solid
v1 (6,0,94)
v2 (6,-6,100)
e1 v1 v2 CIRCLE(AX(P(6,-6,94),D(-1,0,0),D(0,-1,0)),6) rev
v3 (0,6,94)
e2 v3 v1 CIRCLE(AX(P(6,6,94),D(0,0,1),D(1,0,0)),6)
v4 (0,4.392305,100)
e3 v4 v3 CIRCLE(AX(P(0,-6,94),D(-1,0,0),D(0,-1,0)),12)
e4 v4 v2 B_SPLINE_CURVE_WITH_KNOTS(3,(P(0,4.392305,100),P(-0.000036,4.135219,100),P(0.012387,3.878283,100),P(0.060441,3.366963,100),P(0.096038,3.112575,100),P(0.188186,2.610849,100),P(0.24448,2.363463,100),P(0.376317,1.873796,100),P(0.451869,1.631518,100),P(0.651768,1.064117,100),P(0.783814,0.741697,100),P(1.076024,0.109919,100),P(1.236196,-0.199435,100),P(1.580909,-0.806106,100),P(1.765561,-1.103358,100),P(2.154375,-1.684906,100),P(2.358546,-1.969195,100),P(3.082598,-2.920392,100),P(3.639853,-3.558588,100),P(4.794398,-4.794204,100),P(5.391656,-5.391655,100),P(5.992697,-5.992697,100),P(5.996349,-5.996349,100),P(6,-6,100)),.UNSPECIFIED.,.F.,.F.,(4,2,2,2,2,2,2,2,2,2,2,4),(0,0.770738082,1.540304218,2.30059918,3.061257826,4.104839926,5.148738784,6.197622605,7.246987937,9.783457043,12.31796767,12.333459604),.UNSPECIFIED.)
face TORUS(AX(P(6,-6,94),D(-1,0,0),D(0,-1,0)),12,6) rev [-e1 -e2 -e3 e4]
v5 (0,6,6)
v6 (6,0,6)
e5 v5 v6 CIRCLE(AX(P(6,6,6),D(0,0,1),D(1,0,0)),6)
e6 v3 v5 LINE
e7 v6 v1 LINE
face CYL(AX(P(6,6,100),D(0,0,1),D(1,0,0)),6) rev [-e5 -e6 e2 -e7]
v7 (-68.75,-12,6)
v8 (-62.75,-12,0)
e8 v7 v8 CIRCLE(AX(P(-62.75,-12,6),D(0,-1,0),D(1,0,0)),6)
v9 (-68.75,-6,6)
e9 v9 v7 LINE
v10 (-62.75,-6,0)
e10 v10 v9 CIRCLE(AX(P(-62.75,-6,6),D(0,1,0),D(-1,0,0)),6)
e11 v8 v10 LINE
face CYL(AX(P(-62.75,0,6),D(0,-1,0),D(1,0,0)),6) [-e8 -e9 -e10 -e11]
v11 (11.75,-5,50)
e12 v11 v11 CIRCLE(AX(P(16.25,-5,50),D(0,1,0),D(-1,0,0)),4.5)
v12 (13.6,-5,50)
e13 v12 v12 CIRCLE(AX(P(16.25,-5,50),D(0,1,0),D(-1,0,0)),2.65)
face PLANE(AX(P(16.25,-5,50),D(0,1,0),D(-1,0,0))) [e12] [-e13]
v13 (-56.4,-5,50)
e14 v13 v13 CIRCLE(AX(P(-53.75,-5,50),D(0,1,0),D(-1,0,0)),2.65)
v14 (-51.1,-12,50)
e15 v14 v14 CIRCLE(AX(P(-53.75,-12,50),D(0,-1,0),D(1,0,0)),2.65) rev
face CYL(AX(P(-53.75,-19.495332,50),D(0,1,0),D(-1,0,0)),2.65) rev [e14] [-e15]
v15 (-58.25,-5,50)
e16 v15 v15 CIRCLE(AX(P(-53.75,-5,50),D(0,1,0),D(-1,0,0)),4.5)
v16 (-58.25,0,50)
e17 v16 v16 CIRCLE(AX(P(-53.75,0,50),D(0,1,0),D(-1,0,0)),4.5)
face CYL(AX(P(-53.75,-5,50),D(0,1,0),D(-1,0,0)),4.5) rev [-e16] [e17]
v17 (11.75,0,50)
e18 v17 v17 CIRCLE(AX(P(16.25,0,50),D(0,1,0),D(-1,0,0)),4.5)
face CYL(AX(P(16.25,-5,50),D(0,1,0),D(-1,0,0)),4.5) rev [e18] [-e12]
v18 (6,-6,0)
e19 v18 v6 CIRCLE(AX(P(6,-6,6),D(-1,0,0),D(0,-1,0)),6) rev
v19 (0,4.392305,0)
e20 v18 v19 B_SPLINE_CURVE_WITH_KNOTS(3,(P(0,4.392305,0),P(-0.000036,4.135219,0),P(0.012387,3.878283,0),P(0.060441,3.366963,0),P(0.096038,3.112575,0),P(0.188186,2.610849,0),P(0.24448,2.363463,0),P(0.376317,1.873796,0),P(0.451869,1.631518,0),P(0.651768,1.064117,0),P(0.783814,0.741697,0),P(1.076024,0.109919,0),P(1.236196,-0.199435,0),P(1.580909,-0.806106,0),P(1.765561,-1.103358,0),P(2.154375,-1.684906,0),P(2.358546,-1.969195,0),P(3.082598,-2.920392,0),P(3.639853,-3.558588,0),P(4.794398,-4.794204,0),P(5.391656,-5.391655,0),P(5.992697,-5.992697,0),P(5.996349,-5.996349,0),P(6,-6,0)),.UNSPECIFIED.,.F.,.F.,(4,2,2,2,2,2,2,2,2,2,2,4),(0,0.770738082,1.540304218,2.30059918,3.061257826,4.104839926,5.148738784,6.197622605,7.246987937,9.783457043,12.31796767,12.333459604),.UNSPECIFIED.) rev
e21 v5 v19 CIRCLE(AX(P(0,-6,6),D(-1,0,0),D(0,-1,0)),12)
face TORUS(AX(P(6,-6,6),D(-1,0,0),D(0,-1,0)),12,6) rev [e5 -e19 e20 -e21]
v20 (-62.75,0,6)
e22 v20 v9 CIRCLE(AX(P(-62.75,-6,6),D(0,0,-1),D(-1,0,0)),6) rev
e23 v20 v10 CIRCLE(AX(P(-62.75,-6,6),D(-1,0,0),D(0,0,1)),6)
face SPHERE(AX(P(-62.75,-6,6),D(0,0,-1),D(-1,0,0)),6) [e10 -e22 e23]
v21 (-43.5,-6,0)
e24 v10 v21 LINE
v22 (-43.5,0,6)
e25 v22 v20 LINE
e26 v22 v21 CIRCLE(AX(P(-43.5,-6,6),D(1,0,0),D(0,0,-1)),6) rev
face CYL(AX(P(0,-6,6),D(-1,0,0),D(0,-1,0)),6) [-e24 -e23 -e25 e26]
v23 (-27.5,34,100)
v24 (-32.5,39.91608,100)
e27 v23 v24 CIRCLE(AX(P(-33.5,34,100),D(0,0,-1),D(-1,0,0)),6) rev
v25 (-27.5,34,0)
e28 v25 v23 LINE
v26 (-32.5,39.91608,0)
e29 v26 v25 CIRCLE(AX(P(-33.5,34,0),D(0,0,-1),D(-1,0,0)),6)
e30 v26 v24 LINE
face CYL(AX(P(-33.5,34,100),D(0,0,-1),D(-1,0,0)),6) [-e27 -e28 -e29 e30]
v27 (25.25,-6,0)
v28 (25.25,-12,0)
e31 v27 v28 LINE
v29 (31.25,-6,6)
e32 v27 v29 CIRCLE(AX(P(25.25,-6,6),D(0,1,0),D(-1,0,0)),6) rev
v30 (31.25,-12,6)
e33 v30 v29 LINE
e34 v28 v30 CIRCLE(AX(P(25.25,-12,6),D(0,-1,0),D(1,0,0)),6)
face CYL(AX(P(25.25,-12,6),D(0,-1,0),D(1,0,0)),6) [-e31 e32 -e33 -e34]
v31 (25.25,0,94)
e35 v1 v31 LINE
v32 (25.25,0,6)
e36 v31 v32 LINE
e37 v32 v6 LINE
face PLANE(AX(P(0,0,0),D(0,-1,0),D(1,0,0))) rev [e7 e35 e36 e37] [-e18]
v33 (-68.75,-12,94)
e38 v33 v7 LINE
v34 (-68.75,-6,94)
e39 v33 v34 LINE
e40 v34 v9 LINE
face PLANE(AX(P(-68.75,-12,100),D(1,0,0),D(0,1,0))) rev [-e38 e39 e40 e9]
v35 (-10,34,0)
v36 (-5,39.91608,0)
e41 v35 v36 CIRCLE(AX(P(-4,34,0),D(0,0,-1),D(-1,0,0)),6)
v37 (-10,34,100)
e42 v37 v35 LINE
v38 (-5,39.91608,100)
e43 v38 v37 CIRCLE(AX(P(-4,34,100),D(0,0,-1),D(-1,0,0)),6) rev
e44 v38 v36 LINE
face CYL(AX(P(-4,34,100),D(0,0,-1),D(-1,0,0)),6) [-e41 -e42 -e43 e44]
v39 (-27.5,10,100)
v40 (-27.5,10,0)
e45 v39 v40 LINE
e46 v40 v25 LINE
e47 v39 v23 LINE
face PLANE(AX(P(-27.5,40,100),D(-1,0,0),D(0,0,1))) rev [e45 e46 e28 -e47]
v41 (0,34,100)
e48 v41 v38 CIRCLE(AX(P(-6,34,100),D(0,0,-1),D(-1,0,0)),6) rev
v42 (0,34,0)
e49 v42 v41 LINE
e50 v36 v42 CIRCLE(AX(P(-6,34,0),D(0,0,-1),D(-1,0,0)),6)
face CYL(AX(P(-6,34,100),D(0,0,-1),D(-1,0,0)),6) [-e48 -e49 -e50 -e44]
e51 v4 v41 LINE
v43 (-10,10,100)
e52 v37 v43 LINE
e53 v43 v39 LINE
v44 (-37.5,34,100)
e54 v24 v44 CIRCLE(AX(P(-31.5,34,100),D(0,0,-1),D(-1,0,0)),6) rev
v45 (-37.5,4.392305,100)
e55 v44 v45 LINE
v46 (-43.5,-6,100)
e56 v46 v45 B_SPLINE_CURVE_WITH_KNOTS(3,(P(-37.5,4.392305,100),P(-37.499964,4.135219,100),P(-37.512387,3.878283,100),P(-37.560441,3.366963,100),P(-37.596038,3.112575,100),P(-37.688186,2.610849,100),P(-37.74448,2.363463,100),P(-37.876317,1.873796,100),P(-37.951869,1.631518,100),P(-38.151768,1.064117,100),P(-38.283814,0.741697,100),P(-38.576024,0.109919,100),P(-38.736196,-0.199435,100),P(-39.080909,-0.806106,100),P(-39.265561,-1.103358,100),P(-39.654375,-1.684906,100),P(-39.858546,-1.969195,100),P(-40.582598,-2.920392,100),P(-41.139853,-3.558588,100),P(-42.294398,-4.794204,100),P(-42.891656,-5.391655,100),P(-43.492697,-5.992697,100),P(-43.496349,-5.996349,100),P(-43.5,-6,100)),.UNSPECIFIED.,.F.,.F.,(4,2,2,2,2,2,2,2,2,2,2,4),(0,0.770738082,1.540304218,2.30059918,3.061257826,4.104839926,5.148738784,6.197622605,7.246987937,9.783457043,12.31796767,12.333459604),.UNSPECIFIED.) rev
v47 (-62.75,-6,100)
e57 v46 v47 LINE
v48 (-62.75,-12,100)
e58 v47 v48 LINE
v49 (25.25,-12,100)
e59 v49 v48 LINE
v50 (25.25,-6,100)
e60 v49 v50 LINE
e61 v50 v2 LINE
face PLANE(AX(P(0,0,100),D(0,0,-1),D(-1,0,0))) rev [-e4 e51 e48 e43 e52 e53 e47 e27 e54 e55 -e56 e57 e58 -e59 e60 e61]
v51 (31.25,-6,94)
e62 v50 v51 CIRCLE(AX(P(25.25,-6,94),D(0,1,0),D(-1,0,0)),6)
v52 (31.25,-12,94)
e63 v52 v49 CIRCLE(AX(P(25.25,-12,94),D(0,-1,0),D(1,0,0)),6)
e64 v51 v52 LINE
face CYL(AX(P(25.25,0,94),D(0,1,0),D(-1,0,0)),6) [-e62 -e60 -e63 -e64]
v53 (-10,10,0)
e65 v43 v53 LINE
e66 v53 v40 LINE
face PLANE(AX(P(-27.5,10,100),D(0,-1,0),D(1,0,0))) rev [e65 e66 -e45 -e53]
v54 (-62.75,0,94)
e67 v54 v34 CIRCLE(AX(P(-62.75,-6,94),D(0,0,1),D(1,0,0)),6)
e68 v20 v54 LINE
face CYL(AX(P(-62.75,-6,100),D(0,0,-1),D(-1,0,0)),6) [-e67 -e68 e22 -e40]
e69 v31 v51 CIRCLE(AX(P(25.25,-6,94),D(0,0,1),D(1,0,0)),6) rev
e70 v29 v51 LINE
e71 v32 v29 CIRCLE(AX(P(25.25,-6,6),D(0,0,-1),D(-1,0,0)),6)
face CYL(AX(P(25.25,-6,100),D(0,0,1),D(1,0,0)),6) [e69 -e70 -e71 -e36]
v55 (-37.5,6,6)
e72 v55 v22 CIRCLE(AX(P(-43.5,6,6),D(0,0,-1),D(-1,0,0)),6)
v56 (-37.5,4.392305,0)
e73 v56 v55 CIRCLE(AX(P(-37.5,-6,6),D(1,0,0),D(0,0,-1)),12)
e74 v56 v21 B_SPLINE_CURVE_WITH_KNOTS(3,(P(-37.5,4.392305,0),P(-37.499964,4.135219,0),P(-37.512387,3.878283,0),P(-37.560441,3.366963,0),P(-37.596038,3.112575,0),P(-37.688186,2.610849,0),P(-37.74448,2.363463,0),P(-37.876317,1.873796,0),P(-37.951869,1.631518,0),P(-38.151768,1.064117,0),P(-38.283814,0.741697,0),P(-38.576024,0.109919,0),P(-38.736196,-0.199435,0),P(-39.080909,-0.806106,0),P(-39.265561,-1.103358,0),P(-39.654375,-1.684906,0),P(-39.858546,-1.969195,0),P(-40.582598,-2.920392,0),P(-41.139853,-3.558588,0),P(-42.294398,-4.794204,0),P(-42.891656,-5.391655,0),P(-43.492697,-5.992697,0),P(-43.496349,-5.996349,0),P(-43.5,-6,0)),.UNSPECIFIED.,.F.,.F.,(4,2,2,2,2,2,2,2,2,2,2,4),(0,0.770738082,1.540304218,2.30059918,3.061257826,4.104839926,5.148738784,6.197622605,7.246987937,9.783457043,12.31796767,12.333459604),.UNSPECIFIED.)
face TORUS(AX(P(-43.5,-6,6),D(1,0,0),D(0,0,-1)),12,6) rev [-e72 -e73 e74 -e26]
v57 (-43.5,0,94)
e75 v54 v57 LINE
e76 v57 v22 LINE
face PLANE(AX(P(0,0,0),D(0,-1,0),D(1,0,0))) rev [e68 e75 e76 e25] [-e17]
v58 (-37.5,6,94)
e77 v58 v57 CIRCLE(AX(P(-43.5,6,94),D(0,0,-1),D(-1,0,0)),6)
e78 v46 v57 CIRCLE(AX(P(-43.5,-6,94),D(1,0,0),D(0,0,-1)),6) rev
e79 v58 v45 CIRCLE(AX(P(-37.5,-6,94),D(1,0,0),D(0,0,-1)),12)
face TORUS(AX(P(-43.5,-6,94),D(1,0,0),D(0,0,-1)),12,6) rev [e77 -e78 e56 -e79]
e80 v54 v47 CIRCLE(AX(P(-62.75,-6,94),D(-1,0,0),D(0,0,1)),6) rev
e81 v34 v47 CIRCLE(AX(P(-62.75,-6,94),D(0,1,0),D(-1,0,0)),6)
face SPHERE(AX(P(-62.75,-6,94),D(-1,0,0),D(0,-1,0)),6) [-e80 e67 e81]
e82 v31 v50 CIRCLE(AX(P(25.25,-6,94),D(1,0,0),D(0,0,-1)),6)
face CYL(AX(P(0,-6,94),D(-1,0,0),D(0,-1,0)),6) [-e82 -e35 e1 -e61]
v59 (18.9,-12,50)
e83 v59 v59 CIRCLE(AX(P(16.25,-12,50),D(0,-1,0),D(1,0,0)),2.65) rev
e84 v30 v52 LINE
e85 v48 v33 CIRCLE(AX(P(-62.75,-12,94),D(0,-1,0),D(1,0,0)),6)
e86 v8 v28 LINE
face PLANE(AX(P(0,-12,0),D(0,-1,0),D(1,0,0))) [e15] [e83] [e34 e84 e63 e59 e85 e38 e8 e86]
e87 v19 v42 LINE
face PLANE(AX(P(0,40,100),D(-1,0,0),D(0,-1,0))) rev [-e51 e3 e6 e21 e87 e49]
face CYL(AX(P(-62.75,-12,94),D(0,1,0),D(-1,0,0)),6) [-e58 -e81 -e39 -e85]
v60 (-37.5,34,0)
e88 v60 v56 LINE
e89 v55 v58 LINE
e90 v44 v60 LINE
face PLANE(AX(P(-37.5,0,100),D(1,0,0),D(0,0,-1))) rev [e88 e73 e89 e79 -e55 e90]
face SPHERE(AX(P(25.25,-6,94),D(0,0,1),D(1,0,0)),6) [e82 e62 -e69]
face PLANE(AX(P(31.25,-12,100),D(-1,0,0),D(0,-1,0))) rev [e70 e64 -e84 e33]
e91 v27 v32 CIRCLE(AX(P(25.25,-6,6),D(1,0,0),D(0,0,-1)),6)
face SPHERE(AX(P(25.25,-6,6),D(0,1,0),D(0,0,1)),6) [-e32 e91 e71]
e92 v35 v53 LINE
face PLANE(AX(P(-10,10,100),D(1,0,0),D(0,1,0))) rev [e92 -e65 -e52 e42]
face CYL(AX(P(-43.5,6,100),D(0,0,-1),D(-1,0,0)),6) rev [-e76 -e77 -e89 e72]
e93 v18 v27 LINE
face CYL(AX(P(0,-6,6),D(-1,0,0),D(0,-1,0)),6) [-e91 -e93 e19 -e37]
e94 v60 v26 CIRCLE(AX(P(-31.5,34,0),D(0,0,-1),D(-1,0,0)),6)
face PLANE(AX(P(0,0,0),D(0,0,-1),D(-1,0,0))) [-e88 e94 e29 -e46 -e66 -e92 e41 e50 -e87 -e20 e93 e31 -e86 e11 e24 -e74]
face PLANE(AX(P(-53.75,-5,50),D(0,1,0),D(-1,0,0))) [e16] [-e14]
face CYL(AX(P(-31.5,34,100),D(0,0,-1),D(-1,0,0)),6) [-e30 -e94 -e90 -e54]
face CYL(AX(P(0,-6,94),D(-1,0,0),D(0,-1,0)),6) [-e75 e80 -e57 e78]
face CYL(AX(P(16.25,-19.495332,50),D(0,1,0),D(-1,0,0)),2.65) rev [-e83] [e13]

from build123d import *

# Parameters (mm, degrees)
BOSS_EXTRUDE1_DEPTH = 100
SKETCH2_W           = 100
SKETCH2_H           = 100
BOSS_EXTRUDE2_DEPTH = 12
SKETCH3_R           = 4.5
CUT_EXTRUDE1_DEPTH  = 5
SKETCH4_R           = 2.65
CUT_EXTRUDE2_DEPTH  = 7
FILLET1_R           = 6
FILLET3_R           = 6
FILLET4_R           = 6


with BuildPart() as part:
    # Sketch1 → Boss-Extrude1 (new body)
    with BuildSketch(Plane.XY):
        Polygon((0, 0), (-37.5, 0), (-37.5, 40), (-27.5, 40), (-27.5, 10), (-10, 10), (-10, 40), (0, 40), align=None)
    extrude(amount=BOSS_EXTRUDE1_DEPTH)

    # Sketch2 → Boss-Extrude2 (add)
    with BuildSketch(Plane.XZ):
        with Locations((-18.75, 50)):
            Rectangle(SKETCH2_W, SKETCH2_H)
    extrude(amount=BOSS_EXTRUDE2_DEPTH)

    # Sketch3 → Cut-Extrude1 (cut)
    with BuildSketch(Plane(origin=(0, 0, 0), x_dir=(1, 0, 0), z_dir=(0, 1, 0))):
        with Locations(Location((16.25, -50, 0), (0, 0, 180))):
            Circle(SKETCH3_R)
        with Locations(Location((-53.75, -50, 0), (0, 0, 180))):
            Circle(SKETCH3_R)
    extrude(amount=-CUT_EXTRUDE1_DEPTH, mode=Mode.SUBTRACT)

    # Sketch4 → Cut-Extrude2 (cut)
    with BuildSketch(Plane(origin=(0, -5, 0), x_dir=(1, 0, 0), z_dir=(0, 1, 0))):
        with Locations(Location((16.25, -50, 0), (0, 0, 180))):
            Circle(SKETCH4_R)
        with Locations(Location((-53.75, -50, 0), (0, 0, 180))):
            Circle(SKETCH4_R)
    extrude(amount=-CUT_EXTRUDE2_DEPTH, mode=Mode.SUBTRACT)

    # Fillet1
    # the kernel refuses this fillet: 6 mm, written as the material it takes off along each edge
    with BuildSketch(Plane(origin=(25.25, -6, 6), x_dir=(0, 1, 0), z_dir=(1, 0, 0))) as fillet1_piece_1_section:
        Polygon((0, 0), (FILLET1_R, 0), (FILLET1_R, -FILLET1_R), (0, -FILLET1_R), align=None)
    fillet1_piece_1 = extrude(amount=FILLET1_R, mode=Mode.PRIVATE)
    fillet1_piece_1 = fillet1_piece_1 - Plane(origin=(25.25, -6, 6), x_dir=(0, -0.7071067811865475, 0.7071067811865475), z_dir=(1, 0, 0)) * Sphere(FILLET1_R, mode=Mode.PRIVATE)
    add(fillet1_piece_1, mode=Mode.SUBTRACT)
    with BuildSketch(Plane(origin=(25.25, -6, 94), x_dir=(1, 0, 0), z_dir=(0, 0, 1))) as fillet1_piece_2_section:
        Polygon((0, 0), (FILLET1_R, 0), (FILLET1_R, FILLET1_R), (0, FILLET1_R), align=None)
    fillet1_piece_2 = extrude(amount=FILLET1_R, mode=Mode.PRIVATE)
    fillet1_piece_2 = fillet1_piece_2 - Plane(origin=(25.25, -6, 94), x_dir=(-0.7071067811865474, -0.7071067811865477, 0), z_dir=(0, 0, 1)) * Sphere(FILLET1_R, mode=Mode.PRIVATE)
    add(fillet1_piece_2, mode=Mode.SUBTRACT)
    with BuildSketch(Plane(origin=(-62.75, -6, 94), x_dir=(-1, 0, 0), z_dir=(0, 0, 1))) as fillet1_piece_3_section:
        Polygon((0, 0), (FILLET1_R, 0), (FILLET1_R, -FILLET1_R), (0, -FILLET1_R), align=None)
    fillet1_piece_3 = extrude(amount=FILLET1_R, mode=Mode.PRIVATE)
    fillet1_piece_3 = fillet1_piece_3 - Plane(origin=(-62.75, -6, 94), x_dir=(0.7071067811865477, -0.7071067811865474, 0), z_dir=(0, 0, 1)) * Sphere(FILLET1_R, mode=Mode.PRIVATE)
    add(fillet1_piece_3, mode=Mode.SUBTRACT)
    with BuildSketch(Plane(origin=(-62.75, -6, 6), x_dir=(0, 1, 0), z_dir=(-1, 0, 0))) as fillet1_piece_4_section:
        Polygon((0, 0), (FILLET1_R, 0), (FILLET1_R, FILLET1_R), (0, FILLET1_R), align=None)
    fillet1_piece_4 = extrude(amount=FILLET1_R, mode=Mode.PRIVATE)
    fillet1_piece_4 = fillet1_piece_4 - Plane(origin=(-62.75, -6, 6), x_dir=(0, -0.7071067811865475, 0.7071067811865475), z_dir=(-1, 0, 0)) * Sphere(FILLET1_R, mode=Mode.PRIVATE)
    add(fillet1_piece_4, mode=Mode.SUBTRACT)
    with BuildSketch(Plane(origin=(31.25, -6, 0), x_dir=(0, 0, 1), z_dir=(0, -1, 0)), Plane(origin=(31.25, -6, 100), x_dir=(-1, 0, 0), z_dir=(0, -1, 0))) as fillet1_piece_5:
        with BuildLine():
            CenterArc((FILLET1_R, FILLET1_R), FILLET1_R, 180, 90)
            Line((0, FILLET1_R), (0, 0))
            Line((0, 0), (FILLET1_R, 0))
        make_face()
    extrude(amount=21, mode=Mode.SUBTRACT)
    with BuildSketch(Plane(origin=(25.25, 0, 0), x_dir=(0, 0, 1), z_dir=(-1, 0, 0)), Plane(origin=(-37.5, 0, 0), x_dir=(0, 0, 1), z_dir=(-1, 0, 0))) as fillet1_piece_6:
        with BuildLine():
            CenterArc((FILLET1_R, -FILLET1_R), FILLET1_R, 90, 90)
            Line((0, -FILLET1_R), (0, 0))
            Line((0, 0), (FILLET1_R, 0))
        make_face()
    extrude(amount=25.25, mode=Mode.SUBTRACT)
    with BuildSketch(Plane(origin=(31.25, 0, 94), x_dir=(0, -1, 0), z_dir=(0, 0, -1)), Plane(origin=(-68.75, 0, 6), x_dir=(0, -1, 0), z_dir=(0, 0, 1))) as fillet1_piece_7:
        with BuildLine():
            CenterArc((FILLET1_R, FILLET1_R), FILLET1_R, 180, 90)
            Line((0, FILLET1_R), (0, 0))
            Line((0, 0), (FILLET1_R, 0))
        make_face()
    extrude(amount=88, mode=Mode.SUBTRACT)
    with BuildSketch(Plane(origin=(0, 0, 100), x_dir=(0, -1, 0), z_dir=(1, 0, 0)), Plane(origin=(-62.75, 0, 100), x_dir=(0, -1, 0), z_dir=(1, 0, 0))) as fillet1_piece_8:
        with BuildLine():
            CenterArc((FILLET1_R, FILLET1_R), FILLET1_R, 180, 90)
            Line((0, FILLET1_R), (0, 0))
            Line((0, 0), (FILLET1_R, 0))
        make_face()
    extrude(amount=25.25, mode=Mode.SUBTRACT)
    with BuildSketch(Plane(origin=(-68.75, -6, 100), x_dir=(1, 0, 0), z_dir=(0, -1, 0)), Plane(origin=(-68.75, -6, 0), x_dir=(0, 0, 1), z_dir=(0, -1, 0))) as fillet1_piece_9:
        with BuildLine():
            CenterArc((FILLET1_R, -FILLET1_R), FILLET1_R, 90, 90)
            Line((0, -FILLET1_R), (0, 0))
            Line((0, 0), (FILLET1_R, 0))
        make_face()
    extrude(amount=21, mode=Mode.SUBTRACT)
    with BuildSketch(Plane(origin=(-10, 40, -15), x_dir=(1, 0, 0), z_dir=(0, 0, 1)), Plane(origin=(-27.5, 40, -15), x_dir=(0, -1, 0), z_dir=(0, 0, 1)), Plane(origin=(-37.5, 40, -15), x_dir=(1, 0, 0), z_dir=(0, 0, 1)), Plane(origin=(0, 40, -15), x_dir=(0, -1, 0), z_dir=(0, 0, 1))) as fillet1_piece_10:
        with BuildLine():
            CenterArc((FILLET1_R, -FILLET1_R), FILLET1_R, 90, 90)
            Line((0, -FILLET1_R), (0, 0))
            Line((0, 0), (FILLET1_R, 0))
        make_face()
    extrude(amount=130, mode=Mode.SUBTRACT)

    # Fillet3
    fillet3_edges = [part.edges().sort_by_distance(p)[0] for p in [
        (0, 0, 50),
        (0, -1.757359313, 1.757359313),
        (0, -1.757359313, 98.242640687),
    ]]
    fillet(fillet3_edges, radius=FILLET3_R)

    # Fillet4
    # the kernel refuses this fillet: 6 mm, written as the material it adds along each edge
    with BuildSketch(Plane(origin=(-37.5, 0, 6), x_dir=(0, 1, 0), z_dir=(0, 0, 1))) as fillet4_piece_1:
        with BuildLine():
            CenterArc((FILLET4_R, FILLET4_R), FILLET4_R, 180, 90)
            Line((0, FILLET4_R), (0, 0))
            Line((0, 0), (FILLET4_R, 0))
        make_face()
    extrude(amount=88)
    with BuildSketch(Plane(origin=(-37.5, -6, 94), x_dir=(0, 1, 0), z_dir=(0, 0, -1))) as fillet4_piece_2_section:
        with BuildLine():
            CenterArc((6 + FILLET4_R, -FILLET4_R), FILLET4_R, 90, 90)
            Line((6 + FILLET4_R, 0), (6, 0))
            Line((6, 0), (6, -FILLET4_R))
        make_face()
    fillet4_piece_2 = revolve(axis=Axis((-37.5, -6, 94), (1, 0, 0)), revolution_arc=233.296989237, mode=Mode.PRIVATE)
    fillet4_piece_2 = split(fillet4_piece_2, bisect_by=Plane(origin=(-39.369769667, -1.500366283, 100), z_dir=(0, 0, -1)), keep=Keep.TOP, mode=Mode.PRIVATE)
    fillet4_piece_2 = split(fillet4_piece_2, bisect_by=Plane(origin=(-39.369769667, -12, 98.499633777), z_dir=(0, 1, 0)), keep=Keep.TOP, mode=Mode.PRIVATE)
    add(fillet4_piece_2)
    with BuildSketch(Plane(origin=(-37.5, -6, 6), x_dir=(0, 1, 0), z_dir=(0, 0, 1))) as fillet4_piece_3_section:
        with BuildLine():
            CenterArc((6 + FILLET4_R, FILLET4_R), FILLET4_R, 180, 90)
            Line((6, FILLET4_R), (6, 0))
            Line((6, 0), (6 + FILLET4_R, 0))
        make_face()
    fillet4_piece_3 = revolve(axis=Axis((-37.5, -6, 6), (-1, 0, 0)), revolution_arc=233.296989237, mode=Mode.PRIVATE)
    fillet4_piece_3 = split(fillet4_piece_3, bisect_by=Plane(origin=(-38.503801185, -12, 3.658909584), z_dir=(0, 1, 0)), keep=Keep.TOP, mode=Mode.PRIVATE)
    fillet4_piece_3 = split(fillet4_piece_3, bisect_by=Plane(origin=(-38.503801185, 1.318651502, 0), z_dir=(0, 0, 1)), keep=Keep.TOP, mode=Mode.PRIVATE)
    add(fillet4_piece_3)


solid = part.part
